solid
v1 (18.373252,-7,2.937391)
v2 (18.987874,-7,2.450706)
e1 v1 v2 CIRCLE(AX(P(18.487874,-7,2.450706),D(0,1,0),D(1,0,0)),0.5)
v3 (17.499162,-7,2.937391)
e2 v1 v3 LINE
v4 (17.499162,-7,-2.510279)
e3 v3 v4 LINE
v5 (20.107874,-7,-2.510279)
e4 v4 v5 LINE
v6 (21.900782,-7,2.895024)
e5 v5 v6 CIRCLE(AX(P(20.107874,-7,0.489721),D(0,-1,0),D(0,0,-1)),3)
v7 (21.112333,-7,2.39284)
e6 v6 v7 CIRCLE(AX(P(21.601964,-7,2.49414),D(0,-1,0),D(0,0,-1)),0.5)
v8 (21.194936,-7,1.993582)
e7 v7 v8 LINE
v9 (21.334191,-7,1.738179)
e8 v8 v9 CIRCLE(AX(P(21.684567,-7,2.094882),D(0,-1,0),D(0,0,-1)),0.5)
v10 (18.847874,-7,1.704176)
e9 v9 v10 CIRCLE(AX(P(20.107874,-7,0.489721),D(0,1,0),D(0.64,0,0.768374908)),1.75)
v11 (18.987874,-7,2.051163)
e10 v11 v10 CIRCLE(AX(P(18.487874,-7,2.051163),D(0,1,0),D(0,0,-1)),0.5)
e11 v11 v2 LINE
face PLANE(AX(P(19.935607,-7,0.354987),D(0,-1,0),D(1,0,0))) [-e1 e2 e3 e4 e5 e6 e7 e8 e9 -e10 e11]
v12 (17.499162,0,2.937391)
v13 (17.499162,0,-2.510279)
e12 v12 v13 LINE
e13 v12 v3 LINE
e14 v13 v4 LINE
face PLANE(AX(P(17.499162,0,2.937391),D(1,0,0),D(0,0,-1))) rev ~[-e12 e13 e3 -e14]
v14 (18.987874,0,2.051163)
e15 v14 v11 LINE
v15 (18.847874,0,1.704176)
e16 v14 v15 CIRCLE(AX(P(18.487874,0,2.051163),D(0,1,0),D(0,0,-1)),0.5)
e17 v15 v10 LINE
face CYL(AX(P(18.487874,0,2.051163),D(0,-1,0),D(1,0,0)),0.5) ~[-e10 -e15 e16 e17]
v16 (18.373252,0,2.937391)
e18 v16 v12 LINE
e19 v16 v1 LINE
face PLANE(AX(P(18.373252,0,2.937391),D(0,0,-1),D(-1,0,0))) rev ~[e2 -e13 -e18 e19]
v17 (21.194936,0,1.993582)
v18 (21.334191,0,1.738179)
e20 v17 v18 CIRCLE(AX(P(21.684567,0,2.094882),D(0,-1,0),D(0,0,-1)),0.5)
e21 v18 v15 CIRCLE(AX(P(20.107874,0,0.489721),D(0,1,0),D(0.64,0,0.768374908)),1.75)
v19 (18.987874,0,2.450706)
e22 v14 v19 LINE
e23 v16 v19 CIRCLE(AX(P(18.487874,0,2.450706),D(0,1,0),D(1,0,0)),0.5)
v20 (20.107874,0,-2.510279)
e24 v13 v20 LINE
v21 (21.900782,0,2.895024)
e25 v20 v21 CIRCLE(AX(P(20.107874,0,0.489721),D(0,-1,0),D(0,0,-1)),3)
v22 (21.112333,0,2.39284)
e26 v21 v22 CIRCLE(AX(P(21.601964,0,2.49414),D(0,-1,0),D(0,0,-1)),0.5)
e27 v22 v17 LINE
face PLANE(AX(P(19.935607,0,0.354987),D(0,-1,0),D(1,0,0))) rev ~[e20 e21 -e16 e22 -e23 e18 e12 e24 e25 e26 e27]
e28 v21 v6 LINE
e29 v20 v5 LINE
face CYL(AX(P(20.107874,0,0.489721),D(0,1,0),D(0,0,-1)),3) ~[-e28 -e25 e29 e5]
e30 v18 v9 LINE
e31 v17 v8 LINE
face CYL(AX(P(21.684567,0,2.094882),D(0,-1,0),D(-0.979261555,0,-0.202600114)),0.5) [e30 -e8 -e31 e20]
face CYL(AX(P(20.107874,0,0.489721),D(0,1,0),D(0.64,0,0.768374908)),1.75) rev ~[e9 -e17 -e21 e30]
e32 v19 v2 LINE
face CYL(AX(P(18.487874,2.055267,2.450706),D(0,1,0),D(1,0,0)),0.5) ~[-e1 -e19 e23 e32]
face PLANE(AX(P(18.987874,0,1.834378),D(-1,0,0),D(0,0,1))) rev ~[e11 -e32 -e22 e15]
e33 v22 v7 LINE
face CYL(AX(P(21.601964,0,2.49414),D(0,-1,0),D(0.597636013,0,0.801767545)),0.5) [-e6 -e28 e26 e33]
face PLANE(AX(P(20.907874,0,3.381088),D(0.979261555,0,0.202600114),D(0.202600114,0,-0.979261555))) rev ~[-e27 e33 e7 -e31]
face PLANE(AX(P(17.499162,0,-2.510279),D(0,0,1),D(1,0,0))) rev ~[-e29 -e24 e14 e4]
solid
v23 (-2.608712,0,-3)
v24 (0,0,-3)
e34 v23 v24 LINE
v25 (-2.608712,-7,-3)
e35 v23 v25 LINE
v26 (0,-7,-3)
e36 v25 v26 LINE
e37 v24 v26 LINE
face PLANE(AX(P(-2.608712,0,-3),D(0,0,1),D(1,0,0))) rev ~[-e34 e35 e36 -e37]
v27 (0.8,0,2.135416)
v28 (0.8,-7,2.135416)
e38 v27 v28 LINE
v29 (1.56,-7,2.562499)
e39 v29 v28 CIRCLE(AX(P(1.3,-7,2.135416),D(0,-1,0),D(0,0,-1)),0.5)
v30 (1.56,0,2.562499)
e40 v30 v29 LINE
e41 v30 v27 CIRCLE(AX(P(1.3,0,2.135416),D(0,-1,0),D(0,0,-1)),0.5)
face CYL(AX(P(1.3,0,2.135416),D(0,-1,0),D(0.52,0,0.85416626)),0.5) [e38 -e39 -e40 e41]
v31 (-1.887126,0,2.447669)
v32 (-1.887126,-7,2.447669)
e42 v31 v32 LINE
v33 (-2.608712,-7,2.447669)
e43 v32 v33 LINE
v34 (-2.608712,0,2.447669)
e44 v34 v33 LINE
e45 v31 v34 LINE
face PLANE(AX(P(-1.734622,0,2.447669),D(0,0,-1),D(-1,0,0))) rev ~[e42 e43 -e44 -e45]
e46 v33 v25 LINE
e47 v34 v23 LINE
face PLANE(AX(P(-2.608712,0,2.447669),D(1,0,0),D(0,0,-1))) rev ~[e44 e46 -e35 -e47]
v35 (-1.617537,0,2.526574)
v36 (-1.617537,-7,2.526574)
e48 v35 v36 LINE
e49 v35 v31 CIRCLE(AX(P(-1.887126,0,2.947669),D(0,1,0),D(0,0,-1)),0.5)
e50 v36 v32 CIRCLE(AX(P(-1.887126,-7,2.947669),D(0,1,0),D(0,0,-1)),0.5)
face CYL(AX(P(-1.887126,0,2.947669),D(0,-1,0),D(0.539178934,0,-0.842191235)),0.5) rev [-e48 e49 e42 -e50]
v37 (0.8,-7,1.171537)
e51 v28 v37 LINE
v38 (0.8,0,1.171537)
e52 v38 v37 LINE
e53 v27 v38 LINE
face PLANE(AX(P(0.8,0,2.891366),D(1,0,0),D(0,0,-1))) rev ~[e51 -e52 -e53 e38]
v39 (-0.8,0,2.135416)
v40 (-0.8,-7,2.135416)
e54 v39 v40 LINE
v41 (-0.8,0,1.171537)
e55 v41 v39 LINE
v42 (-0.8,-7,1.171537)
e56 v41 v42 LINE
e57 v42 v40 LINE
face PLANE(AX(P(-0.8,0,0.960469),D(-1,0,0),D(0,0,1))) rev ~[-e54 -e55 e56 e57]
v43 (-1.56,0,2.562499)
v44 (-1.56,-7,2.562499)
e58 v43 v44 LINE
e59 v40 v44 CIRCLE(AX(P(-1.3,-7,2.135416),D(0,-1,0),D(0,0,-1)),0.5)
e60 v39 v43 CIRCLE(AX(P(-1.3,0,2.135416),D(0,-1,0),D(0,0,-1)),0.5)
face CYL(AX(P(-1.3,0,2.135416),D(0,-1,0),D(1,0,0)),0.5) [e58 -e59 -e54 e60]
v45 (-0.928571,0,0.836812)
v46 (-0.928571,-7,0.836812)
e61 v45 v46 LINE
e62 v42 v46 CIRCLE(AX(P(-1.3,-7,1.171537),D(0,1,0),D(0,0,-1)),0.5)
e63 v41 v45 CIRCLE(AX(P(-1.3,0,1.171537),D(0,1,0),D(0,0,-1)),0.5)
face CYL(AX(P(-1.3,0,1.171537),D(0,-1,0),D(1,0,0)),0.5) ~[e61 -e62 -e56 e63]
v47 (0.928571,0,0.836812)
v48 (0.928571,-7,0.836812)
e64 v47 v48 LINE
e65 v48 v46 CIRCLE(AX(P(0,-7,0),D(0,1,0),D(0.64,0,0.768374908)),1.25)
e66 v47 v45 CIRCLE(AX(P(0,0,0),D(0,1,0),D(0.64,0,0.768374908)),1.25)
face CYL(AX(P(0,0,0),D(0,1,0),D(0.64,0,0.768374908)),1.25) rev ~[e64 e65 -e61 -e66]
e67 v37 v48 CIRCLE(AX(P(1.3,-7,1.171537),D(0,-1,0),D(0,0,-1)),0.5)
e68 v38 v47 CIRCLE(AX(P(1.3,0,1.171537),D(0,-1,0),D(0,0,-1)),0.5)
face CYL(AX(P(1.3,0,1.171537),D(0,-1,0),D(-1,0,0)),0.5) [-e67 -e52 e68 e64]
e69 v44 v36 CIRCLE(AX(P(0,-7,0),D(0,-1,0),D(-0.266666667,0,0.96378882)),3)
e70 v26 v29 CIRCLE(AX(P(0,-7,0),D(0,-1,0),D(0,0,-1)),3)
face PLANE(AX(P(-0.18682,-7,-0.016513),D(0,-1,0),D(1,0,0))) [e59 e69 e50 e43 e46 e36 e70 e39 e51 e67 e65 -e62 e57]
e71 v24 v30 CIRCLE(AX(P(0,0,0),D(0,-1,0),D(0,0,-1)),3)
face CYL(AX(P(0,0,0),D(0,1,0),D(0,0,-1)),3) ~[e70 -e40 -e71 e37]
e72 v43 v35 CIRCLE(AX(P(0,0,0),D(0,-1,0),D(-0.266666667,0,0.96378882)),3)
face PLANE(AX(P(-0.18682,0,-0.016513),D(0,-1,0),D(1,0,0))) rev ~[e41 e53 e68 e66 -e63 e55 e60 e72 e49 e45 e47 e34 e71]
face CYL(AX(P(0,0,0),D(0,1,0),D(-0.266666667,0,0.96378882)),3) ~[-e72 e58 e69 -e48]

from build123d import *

# Parameters (mm, degrees)
F1_DEPTH    = 7
F2_R        = 0.5
F2_2_R      = 0.5
F3_T1_DEPTH = 11.1105344099


# Not quite as in the source:
# - a fillet or chamfer that OpenCascade refuses, or shapes differently, is made with other operations: its cross-section is extruded or revolved along the edge and cut away or added


with BuildPart() as f1:
    # F0 (on Front) → F1 (new body)
    with BuildSketch(Plane.XZ):
        with BuildLine():
            Line((-0.8, 0.9604686356), (-0.8, 2.891366459))
            ThreePointArc((-0.8, 2.891366459), (-1.2865824769, 2.7101117191), (-1.734622404, 2.4476693232))
            Line((-1.734622404, 2.4476693232), (-2.6087118245, 2.4476693232))
            Line((-2.6087118245, 2.4476693232), (-2.6087118245, 1.4814258728))
            Line((-2.6087118245, 1.4814258728), (-2.6087118245, -1.4814258728))
            Line((-2.6087118245, -1.4814258728), (-2.6087118245, -3))
            Line((-2.6087118245, -3), (0, -3))
            ThreePointArc((0, -3), (2.9727175595, -0.4036710437), (0.8, 2.891366459))
            Line((0.8, 2.891366459), (0.8, 0.9604686356))
            ThreePointArc((0.8, 0.9604686356), (0, -1.25), (-0.8, 0.9604686356))
        make_face()
    extrude(amount=F1_DEPTH)

    # F2
    f2_edges = [f1.edges().sort_by_distance(p)[0] for p in [
        (-0.8, -3.5, 2.891366),
        (-0.8, -3.5, 0.960469),
        (0.8, -3.5, 0.960469),
        (0.8, -3.5, 2.891366),
        (-1.734622, -3.5, 2.447669),
    ]]
    fillet(f2_edges, radius=F2_R)


with BuildPart() as f1b:
    # F0 (on Front) → F1, piece 2 (new body)
    with BuildSketch(Plane.XZ):
        with BuildLine():
            Line((18.987874046, 1.8343775348), (18.987874046, 3.2728132508))
            ThreePointArc((18.987874046, 3.2728132508), (18.6707434577, 3.1230948845), (18.373251642, 2.9373907681))
            Line((18.373251642, 2.9373907681), (17.4991622215, 2.9373907681))
            Line((17.4991622215, 2.9373907681), (17.4991622215, 1.9711473178))
            Line((17.4991622215, 1.9711473178), (17.4991622215, -0.9917044279))
            Line((17.4991622215, -0.9917044279), (17.4991622215, -2.5102785551))
            Line((17.4991622215, -2.5102785551), (20.107874046, -2.5102785551))
            ThreePointArc((20.107874046, -2.5102785551), (23.0805916054, 0.0860504012), (20.907874046, 3.3810879039))
            Line((20.907874046, 3.3810879039), (21.227874046, 1.8343775348))
            ThreePointArc((21.227874046, 1.8343775348), (20.107874046, -1.2602785551), (18.987874046, 1.8343775348))
        make_face()
    extrude(amount=F1_DEPTH)

    # F2#2
    f2_2_edges = [f1b.edges().sort_by_distance(p)[0] for p in [
        (18.987874, -3.5, 1.834378),
        (20.907874, -3.5, 3.381088),
        (21.227874, -3.5, 1.834378),
    ]]
    fillet(f2_2_edges, radius=F2_2_R)

    # F3: fillet of radius 0.5 on 1 edges, made by hand

    # F3_s2 → F3_t1 (cut)
    with BuildSketch(Plane.XZ.offset(-2.055267205)):
        with BuildLine():
            ThreePointArc((18.987874046, 2.4507063688), (18.7982679876, 2.8426956557), (18.373251642, 2.9373907681))
            ThreePointArc((18.373251642, 2.9373907681), (18.6707434577, 3.1230948845), (18.987874046, 3.2728132508))
            Line((18.987874046, 3.2728132508), (18.987874046, 2.4507063688))
        make_face()
    extrude(amount=F3_T1_DEPTH, mode=Mode.SUBTRACT)


solid = Compound([f1.part, f1b.part])
